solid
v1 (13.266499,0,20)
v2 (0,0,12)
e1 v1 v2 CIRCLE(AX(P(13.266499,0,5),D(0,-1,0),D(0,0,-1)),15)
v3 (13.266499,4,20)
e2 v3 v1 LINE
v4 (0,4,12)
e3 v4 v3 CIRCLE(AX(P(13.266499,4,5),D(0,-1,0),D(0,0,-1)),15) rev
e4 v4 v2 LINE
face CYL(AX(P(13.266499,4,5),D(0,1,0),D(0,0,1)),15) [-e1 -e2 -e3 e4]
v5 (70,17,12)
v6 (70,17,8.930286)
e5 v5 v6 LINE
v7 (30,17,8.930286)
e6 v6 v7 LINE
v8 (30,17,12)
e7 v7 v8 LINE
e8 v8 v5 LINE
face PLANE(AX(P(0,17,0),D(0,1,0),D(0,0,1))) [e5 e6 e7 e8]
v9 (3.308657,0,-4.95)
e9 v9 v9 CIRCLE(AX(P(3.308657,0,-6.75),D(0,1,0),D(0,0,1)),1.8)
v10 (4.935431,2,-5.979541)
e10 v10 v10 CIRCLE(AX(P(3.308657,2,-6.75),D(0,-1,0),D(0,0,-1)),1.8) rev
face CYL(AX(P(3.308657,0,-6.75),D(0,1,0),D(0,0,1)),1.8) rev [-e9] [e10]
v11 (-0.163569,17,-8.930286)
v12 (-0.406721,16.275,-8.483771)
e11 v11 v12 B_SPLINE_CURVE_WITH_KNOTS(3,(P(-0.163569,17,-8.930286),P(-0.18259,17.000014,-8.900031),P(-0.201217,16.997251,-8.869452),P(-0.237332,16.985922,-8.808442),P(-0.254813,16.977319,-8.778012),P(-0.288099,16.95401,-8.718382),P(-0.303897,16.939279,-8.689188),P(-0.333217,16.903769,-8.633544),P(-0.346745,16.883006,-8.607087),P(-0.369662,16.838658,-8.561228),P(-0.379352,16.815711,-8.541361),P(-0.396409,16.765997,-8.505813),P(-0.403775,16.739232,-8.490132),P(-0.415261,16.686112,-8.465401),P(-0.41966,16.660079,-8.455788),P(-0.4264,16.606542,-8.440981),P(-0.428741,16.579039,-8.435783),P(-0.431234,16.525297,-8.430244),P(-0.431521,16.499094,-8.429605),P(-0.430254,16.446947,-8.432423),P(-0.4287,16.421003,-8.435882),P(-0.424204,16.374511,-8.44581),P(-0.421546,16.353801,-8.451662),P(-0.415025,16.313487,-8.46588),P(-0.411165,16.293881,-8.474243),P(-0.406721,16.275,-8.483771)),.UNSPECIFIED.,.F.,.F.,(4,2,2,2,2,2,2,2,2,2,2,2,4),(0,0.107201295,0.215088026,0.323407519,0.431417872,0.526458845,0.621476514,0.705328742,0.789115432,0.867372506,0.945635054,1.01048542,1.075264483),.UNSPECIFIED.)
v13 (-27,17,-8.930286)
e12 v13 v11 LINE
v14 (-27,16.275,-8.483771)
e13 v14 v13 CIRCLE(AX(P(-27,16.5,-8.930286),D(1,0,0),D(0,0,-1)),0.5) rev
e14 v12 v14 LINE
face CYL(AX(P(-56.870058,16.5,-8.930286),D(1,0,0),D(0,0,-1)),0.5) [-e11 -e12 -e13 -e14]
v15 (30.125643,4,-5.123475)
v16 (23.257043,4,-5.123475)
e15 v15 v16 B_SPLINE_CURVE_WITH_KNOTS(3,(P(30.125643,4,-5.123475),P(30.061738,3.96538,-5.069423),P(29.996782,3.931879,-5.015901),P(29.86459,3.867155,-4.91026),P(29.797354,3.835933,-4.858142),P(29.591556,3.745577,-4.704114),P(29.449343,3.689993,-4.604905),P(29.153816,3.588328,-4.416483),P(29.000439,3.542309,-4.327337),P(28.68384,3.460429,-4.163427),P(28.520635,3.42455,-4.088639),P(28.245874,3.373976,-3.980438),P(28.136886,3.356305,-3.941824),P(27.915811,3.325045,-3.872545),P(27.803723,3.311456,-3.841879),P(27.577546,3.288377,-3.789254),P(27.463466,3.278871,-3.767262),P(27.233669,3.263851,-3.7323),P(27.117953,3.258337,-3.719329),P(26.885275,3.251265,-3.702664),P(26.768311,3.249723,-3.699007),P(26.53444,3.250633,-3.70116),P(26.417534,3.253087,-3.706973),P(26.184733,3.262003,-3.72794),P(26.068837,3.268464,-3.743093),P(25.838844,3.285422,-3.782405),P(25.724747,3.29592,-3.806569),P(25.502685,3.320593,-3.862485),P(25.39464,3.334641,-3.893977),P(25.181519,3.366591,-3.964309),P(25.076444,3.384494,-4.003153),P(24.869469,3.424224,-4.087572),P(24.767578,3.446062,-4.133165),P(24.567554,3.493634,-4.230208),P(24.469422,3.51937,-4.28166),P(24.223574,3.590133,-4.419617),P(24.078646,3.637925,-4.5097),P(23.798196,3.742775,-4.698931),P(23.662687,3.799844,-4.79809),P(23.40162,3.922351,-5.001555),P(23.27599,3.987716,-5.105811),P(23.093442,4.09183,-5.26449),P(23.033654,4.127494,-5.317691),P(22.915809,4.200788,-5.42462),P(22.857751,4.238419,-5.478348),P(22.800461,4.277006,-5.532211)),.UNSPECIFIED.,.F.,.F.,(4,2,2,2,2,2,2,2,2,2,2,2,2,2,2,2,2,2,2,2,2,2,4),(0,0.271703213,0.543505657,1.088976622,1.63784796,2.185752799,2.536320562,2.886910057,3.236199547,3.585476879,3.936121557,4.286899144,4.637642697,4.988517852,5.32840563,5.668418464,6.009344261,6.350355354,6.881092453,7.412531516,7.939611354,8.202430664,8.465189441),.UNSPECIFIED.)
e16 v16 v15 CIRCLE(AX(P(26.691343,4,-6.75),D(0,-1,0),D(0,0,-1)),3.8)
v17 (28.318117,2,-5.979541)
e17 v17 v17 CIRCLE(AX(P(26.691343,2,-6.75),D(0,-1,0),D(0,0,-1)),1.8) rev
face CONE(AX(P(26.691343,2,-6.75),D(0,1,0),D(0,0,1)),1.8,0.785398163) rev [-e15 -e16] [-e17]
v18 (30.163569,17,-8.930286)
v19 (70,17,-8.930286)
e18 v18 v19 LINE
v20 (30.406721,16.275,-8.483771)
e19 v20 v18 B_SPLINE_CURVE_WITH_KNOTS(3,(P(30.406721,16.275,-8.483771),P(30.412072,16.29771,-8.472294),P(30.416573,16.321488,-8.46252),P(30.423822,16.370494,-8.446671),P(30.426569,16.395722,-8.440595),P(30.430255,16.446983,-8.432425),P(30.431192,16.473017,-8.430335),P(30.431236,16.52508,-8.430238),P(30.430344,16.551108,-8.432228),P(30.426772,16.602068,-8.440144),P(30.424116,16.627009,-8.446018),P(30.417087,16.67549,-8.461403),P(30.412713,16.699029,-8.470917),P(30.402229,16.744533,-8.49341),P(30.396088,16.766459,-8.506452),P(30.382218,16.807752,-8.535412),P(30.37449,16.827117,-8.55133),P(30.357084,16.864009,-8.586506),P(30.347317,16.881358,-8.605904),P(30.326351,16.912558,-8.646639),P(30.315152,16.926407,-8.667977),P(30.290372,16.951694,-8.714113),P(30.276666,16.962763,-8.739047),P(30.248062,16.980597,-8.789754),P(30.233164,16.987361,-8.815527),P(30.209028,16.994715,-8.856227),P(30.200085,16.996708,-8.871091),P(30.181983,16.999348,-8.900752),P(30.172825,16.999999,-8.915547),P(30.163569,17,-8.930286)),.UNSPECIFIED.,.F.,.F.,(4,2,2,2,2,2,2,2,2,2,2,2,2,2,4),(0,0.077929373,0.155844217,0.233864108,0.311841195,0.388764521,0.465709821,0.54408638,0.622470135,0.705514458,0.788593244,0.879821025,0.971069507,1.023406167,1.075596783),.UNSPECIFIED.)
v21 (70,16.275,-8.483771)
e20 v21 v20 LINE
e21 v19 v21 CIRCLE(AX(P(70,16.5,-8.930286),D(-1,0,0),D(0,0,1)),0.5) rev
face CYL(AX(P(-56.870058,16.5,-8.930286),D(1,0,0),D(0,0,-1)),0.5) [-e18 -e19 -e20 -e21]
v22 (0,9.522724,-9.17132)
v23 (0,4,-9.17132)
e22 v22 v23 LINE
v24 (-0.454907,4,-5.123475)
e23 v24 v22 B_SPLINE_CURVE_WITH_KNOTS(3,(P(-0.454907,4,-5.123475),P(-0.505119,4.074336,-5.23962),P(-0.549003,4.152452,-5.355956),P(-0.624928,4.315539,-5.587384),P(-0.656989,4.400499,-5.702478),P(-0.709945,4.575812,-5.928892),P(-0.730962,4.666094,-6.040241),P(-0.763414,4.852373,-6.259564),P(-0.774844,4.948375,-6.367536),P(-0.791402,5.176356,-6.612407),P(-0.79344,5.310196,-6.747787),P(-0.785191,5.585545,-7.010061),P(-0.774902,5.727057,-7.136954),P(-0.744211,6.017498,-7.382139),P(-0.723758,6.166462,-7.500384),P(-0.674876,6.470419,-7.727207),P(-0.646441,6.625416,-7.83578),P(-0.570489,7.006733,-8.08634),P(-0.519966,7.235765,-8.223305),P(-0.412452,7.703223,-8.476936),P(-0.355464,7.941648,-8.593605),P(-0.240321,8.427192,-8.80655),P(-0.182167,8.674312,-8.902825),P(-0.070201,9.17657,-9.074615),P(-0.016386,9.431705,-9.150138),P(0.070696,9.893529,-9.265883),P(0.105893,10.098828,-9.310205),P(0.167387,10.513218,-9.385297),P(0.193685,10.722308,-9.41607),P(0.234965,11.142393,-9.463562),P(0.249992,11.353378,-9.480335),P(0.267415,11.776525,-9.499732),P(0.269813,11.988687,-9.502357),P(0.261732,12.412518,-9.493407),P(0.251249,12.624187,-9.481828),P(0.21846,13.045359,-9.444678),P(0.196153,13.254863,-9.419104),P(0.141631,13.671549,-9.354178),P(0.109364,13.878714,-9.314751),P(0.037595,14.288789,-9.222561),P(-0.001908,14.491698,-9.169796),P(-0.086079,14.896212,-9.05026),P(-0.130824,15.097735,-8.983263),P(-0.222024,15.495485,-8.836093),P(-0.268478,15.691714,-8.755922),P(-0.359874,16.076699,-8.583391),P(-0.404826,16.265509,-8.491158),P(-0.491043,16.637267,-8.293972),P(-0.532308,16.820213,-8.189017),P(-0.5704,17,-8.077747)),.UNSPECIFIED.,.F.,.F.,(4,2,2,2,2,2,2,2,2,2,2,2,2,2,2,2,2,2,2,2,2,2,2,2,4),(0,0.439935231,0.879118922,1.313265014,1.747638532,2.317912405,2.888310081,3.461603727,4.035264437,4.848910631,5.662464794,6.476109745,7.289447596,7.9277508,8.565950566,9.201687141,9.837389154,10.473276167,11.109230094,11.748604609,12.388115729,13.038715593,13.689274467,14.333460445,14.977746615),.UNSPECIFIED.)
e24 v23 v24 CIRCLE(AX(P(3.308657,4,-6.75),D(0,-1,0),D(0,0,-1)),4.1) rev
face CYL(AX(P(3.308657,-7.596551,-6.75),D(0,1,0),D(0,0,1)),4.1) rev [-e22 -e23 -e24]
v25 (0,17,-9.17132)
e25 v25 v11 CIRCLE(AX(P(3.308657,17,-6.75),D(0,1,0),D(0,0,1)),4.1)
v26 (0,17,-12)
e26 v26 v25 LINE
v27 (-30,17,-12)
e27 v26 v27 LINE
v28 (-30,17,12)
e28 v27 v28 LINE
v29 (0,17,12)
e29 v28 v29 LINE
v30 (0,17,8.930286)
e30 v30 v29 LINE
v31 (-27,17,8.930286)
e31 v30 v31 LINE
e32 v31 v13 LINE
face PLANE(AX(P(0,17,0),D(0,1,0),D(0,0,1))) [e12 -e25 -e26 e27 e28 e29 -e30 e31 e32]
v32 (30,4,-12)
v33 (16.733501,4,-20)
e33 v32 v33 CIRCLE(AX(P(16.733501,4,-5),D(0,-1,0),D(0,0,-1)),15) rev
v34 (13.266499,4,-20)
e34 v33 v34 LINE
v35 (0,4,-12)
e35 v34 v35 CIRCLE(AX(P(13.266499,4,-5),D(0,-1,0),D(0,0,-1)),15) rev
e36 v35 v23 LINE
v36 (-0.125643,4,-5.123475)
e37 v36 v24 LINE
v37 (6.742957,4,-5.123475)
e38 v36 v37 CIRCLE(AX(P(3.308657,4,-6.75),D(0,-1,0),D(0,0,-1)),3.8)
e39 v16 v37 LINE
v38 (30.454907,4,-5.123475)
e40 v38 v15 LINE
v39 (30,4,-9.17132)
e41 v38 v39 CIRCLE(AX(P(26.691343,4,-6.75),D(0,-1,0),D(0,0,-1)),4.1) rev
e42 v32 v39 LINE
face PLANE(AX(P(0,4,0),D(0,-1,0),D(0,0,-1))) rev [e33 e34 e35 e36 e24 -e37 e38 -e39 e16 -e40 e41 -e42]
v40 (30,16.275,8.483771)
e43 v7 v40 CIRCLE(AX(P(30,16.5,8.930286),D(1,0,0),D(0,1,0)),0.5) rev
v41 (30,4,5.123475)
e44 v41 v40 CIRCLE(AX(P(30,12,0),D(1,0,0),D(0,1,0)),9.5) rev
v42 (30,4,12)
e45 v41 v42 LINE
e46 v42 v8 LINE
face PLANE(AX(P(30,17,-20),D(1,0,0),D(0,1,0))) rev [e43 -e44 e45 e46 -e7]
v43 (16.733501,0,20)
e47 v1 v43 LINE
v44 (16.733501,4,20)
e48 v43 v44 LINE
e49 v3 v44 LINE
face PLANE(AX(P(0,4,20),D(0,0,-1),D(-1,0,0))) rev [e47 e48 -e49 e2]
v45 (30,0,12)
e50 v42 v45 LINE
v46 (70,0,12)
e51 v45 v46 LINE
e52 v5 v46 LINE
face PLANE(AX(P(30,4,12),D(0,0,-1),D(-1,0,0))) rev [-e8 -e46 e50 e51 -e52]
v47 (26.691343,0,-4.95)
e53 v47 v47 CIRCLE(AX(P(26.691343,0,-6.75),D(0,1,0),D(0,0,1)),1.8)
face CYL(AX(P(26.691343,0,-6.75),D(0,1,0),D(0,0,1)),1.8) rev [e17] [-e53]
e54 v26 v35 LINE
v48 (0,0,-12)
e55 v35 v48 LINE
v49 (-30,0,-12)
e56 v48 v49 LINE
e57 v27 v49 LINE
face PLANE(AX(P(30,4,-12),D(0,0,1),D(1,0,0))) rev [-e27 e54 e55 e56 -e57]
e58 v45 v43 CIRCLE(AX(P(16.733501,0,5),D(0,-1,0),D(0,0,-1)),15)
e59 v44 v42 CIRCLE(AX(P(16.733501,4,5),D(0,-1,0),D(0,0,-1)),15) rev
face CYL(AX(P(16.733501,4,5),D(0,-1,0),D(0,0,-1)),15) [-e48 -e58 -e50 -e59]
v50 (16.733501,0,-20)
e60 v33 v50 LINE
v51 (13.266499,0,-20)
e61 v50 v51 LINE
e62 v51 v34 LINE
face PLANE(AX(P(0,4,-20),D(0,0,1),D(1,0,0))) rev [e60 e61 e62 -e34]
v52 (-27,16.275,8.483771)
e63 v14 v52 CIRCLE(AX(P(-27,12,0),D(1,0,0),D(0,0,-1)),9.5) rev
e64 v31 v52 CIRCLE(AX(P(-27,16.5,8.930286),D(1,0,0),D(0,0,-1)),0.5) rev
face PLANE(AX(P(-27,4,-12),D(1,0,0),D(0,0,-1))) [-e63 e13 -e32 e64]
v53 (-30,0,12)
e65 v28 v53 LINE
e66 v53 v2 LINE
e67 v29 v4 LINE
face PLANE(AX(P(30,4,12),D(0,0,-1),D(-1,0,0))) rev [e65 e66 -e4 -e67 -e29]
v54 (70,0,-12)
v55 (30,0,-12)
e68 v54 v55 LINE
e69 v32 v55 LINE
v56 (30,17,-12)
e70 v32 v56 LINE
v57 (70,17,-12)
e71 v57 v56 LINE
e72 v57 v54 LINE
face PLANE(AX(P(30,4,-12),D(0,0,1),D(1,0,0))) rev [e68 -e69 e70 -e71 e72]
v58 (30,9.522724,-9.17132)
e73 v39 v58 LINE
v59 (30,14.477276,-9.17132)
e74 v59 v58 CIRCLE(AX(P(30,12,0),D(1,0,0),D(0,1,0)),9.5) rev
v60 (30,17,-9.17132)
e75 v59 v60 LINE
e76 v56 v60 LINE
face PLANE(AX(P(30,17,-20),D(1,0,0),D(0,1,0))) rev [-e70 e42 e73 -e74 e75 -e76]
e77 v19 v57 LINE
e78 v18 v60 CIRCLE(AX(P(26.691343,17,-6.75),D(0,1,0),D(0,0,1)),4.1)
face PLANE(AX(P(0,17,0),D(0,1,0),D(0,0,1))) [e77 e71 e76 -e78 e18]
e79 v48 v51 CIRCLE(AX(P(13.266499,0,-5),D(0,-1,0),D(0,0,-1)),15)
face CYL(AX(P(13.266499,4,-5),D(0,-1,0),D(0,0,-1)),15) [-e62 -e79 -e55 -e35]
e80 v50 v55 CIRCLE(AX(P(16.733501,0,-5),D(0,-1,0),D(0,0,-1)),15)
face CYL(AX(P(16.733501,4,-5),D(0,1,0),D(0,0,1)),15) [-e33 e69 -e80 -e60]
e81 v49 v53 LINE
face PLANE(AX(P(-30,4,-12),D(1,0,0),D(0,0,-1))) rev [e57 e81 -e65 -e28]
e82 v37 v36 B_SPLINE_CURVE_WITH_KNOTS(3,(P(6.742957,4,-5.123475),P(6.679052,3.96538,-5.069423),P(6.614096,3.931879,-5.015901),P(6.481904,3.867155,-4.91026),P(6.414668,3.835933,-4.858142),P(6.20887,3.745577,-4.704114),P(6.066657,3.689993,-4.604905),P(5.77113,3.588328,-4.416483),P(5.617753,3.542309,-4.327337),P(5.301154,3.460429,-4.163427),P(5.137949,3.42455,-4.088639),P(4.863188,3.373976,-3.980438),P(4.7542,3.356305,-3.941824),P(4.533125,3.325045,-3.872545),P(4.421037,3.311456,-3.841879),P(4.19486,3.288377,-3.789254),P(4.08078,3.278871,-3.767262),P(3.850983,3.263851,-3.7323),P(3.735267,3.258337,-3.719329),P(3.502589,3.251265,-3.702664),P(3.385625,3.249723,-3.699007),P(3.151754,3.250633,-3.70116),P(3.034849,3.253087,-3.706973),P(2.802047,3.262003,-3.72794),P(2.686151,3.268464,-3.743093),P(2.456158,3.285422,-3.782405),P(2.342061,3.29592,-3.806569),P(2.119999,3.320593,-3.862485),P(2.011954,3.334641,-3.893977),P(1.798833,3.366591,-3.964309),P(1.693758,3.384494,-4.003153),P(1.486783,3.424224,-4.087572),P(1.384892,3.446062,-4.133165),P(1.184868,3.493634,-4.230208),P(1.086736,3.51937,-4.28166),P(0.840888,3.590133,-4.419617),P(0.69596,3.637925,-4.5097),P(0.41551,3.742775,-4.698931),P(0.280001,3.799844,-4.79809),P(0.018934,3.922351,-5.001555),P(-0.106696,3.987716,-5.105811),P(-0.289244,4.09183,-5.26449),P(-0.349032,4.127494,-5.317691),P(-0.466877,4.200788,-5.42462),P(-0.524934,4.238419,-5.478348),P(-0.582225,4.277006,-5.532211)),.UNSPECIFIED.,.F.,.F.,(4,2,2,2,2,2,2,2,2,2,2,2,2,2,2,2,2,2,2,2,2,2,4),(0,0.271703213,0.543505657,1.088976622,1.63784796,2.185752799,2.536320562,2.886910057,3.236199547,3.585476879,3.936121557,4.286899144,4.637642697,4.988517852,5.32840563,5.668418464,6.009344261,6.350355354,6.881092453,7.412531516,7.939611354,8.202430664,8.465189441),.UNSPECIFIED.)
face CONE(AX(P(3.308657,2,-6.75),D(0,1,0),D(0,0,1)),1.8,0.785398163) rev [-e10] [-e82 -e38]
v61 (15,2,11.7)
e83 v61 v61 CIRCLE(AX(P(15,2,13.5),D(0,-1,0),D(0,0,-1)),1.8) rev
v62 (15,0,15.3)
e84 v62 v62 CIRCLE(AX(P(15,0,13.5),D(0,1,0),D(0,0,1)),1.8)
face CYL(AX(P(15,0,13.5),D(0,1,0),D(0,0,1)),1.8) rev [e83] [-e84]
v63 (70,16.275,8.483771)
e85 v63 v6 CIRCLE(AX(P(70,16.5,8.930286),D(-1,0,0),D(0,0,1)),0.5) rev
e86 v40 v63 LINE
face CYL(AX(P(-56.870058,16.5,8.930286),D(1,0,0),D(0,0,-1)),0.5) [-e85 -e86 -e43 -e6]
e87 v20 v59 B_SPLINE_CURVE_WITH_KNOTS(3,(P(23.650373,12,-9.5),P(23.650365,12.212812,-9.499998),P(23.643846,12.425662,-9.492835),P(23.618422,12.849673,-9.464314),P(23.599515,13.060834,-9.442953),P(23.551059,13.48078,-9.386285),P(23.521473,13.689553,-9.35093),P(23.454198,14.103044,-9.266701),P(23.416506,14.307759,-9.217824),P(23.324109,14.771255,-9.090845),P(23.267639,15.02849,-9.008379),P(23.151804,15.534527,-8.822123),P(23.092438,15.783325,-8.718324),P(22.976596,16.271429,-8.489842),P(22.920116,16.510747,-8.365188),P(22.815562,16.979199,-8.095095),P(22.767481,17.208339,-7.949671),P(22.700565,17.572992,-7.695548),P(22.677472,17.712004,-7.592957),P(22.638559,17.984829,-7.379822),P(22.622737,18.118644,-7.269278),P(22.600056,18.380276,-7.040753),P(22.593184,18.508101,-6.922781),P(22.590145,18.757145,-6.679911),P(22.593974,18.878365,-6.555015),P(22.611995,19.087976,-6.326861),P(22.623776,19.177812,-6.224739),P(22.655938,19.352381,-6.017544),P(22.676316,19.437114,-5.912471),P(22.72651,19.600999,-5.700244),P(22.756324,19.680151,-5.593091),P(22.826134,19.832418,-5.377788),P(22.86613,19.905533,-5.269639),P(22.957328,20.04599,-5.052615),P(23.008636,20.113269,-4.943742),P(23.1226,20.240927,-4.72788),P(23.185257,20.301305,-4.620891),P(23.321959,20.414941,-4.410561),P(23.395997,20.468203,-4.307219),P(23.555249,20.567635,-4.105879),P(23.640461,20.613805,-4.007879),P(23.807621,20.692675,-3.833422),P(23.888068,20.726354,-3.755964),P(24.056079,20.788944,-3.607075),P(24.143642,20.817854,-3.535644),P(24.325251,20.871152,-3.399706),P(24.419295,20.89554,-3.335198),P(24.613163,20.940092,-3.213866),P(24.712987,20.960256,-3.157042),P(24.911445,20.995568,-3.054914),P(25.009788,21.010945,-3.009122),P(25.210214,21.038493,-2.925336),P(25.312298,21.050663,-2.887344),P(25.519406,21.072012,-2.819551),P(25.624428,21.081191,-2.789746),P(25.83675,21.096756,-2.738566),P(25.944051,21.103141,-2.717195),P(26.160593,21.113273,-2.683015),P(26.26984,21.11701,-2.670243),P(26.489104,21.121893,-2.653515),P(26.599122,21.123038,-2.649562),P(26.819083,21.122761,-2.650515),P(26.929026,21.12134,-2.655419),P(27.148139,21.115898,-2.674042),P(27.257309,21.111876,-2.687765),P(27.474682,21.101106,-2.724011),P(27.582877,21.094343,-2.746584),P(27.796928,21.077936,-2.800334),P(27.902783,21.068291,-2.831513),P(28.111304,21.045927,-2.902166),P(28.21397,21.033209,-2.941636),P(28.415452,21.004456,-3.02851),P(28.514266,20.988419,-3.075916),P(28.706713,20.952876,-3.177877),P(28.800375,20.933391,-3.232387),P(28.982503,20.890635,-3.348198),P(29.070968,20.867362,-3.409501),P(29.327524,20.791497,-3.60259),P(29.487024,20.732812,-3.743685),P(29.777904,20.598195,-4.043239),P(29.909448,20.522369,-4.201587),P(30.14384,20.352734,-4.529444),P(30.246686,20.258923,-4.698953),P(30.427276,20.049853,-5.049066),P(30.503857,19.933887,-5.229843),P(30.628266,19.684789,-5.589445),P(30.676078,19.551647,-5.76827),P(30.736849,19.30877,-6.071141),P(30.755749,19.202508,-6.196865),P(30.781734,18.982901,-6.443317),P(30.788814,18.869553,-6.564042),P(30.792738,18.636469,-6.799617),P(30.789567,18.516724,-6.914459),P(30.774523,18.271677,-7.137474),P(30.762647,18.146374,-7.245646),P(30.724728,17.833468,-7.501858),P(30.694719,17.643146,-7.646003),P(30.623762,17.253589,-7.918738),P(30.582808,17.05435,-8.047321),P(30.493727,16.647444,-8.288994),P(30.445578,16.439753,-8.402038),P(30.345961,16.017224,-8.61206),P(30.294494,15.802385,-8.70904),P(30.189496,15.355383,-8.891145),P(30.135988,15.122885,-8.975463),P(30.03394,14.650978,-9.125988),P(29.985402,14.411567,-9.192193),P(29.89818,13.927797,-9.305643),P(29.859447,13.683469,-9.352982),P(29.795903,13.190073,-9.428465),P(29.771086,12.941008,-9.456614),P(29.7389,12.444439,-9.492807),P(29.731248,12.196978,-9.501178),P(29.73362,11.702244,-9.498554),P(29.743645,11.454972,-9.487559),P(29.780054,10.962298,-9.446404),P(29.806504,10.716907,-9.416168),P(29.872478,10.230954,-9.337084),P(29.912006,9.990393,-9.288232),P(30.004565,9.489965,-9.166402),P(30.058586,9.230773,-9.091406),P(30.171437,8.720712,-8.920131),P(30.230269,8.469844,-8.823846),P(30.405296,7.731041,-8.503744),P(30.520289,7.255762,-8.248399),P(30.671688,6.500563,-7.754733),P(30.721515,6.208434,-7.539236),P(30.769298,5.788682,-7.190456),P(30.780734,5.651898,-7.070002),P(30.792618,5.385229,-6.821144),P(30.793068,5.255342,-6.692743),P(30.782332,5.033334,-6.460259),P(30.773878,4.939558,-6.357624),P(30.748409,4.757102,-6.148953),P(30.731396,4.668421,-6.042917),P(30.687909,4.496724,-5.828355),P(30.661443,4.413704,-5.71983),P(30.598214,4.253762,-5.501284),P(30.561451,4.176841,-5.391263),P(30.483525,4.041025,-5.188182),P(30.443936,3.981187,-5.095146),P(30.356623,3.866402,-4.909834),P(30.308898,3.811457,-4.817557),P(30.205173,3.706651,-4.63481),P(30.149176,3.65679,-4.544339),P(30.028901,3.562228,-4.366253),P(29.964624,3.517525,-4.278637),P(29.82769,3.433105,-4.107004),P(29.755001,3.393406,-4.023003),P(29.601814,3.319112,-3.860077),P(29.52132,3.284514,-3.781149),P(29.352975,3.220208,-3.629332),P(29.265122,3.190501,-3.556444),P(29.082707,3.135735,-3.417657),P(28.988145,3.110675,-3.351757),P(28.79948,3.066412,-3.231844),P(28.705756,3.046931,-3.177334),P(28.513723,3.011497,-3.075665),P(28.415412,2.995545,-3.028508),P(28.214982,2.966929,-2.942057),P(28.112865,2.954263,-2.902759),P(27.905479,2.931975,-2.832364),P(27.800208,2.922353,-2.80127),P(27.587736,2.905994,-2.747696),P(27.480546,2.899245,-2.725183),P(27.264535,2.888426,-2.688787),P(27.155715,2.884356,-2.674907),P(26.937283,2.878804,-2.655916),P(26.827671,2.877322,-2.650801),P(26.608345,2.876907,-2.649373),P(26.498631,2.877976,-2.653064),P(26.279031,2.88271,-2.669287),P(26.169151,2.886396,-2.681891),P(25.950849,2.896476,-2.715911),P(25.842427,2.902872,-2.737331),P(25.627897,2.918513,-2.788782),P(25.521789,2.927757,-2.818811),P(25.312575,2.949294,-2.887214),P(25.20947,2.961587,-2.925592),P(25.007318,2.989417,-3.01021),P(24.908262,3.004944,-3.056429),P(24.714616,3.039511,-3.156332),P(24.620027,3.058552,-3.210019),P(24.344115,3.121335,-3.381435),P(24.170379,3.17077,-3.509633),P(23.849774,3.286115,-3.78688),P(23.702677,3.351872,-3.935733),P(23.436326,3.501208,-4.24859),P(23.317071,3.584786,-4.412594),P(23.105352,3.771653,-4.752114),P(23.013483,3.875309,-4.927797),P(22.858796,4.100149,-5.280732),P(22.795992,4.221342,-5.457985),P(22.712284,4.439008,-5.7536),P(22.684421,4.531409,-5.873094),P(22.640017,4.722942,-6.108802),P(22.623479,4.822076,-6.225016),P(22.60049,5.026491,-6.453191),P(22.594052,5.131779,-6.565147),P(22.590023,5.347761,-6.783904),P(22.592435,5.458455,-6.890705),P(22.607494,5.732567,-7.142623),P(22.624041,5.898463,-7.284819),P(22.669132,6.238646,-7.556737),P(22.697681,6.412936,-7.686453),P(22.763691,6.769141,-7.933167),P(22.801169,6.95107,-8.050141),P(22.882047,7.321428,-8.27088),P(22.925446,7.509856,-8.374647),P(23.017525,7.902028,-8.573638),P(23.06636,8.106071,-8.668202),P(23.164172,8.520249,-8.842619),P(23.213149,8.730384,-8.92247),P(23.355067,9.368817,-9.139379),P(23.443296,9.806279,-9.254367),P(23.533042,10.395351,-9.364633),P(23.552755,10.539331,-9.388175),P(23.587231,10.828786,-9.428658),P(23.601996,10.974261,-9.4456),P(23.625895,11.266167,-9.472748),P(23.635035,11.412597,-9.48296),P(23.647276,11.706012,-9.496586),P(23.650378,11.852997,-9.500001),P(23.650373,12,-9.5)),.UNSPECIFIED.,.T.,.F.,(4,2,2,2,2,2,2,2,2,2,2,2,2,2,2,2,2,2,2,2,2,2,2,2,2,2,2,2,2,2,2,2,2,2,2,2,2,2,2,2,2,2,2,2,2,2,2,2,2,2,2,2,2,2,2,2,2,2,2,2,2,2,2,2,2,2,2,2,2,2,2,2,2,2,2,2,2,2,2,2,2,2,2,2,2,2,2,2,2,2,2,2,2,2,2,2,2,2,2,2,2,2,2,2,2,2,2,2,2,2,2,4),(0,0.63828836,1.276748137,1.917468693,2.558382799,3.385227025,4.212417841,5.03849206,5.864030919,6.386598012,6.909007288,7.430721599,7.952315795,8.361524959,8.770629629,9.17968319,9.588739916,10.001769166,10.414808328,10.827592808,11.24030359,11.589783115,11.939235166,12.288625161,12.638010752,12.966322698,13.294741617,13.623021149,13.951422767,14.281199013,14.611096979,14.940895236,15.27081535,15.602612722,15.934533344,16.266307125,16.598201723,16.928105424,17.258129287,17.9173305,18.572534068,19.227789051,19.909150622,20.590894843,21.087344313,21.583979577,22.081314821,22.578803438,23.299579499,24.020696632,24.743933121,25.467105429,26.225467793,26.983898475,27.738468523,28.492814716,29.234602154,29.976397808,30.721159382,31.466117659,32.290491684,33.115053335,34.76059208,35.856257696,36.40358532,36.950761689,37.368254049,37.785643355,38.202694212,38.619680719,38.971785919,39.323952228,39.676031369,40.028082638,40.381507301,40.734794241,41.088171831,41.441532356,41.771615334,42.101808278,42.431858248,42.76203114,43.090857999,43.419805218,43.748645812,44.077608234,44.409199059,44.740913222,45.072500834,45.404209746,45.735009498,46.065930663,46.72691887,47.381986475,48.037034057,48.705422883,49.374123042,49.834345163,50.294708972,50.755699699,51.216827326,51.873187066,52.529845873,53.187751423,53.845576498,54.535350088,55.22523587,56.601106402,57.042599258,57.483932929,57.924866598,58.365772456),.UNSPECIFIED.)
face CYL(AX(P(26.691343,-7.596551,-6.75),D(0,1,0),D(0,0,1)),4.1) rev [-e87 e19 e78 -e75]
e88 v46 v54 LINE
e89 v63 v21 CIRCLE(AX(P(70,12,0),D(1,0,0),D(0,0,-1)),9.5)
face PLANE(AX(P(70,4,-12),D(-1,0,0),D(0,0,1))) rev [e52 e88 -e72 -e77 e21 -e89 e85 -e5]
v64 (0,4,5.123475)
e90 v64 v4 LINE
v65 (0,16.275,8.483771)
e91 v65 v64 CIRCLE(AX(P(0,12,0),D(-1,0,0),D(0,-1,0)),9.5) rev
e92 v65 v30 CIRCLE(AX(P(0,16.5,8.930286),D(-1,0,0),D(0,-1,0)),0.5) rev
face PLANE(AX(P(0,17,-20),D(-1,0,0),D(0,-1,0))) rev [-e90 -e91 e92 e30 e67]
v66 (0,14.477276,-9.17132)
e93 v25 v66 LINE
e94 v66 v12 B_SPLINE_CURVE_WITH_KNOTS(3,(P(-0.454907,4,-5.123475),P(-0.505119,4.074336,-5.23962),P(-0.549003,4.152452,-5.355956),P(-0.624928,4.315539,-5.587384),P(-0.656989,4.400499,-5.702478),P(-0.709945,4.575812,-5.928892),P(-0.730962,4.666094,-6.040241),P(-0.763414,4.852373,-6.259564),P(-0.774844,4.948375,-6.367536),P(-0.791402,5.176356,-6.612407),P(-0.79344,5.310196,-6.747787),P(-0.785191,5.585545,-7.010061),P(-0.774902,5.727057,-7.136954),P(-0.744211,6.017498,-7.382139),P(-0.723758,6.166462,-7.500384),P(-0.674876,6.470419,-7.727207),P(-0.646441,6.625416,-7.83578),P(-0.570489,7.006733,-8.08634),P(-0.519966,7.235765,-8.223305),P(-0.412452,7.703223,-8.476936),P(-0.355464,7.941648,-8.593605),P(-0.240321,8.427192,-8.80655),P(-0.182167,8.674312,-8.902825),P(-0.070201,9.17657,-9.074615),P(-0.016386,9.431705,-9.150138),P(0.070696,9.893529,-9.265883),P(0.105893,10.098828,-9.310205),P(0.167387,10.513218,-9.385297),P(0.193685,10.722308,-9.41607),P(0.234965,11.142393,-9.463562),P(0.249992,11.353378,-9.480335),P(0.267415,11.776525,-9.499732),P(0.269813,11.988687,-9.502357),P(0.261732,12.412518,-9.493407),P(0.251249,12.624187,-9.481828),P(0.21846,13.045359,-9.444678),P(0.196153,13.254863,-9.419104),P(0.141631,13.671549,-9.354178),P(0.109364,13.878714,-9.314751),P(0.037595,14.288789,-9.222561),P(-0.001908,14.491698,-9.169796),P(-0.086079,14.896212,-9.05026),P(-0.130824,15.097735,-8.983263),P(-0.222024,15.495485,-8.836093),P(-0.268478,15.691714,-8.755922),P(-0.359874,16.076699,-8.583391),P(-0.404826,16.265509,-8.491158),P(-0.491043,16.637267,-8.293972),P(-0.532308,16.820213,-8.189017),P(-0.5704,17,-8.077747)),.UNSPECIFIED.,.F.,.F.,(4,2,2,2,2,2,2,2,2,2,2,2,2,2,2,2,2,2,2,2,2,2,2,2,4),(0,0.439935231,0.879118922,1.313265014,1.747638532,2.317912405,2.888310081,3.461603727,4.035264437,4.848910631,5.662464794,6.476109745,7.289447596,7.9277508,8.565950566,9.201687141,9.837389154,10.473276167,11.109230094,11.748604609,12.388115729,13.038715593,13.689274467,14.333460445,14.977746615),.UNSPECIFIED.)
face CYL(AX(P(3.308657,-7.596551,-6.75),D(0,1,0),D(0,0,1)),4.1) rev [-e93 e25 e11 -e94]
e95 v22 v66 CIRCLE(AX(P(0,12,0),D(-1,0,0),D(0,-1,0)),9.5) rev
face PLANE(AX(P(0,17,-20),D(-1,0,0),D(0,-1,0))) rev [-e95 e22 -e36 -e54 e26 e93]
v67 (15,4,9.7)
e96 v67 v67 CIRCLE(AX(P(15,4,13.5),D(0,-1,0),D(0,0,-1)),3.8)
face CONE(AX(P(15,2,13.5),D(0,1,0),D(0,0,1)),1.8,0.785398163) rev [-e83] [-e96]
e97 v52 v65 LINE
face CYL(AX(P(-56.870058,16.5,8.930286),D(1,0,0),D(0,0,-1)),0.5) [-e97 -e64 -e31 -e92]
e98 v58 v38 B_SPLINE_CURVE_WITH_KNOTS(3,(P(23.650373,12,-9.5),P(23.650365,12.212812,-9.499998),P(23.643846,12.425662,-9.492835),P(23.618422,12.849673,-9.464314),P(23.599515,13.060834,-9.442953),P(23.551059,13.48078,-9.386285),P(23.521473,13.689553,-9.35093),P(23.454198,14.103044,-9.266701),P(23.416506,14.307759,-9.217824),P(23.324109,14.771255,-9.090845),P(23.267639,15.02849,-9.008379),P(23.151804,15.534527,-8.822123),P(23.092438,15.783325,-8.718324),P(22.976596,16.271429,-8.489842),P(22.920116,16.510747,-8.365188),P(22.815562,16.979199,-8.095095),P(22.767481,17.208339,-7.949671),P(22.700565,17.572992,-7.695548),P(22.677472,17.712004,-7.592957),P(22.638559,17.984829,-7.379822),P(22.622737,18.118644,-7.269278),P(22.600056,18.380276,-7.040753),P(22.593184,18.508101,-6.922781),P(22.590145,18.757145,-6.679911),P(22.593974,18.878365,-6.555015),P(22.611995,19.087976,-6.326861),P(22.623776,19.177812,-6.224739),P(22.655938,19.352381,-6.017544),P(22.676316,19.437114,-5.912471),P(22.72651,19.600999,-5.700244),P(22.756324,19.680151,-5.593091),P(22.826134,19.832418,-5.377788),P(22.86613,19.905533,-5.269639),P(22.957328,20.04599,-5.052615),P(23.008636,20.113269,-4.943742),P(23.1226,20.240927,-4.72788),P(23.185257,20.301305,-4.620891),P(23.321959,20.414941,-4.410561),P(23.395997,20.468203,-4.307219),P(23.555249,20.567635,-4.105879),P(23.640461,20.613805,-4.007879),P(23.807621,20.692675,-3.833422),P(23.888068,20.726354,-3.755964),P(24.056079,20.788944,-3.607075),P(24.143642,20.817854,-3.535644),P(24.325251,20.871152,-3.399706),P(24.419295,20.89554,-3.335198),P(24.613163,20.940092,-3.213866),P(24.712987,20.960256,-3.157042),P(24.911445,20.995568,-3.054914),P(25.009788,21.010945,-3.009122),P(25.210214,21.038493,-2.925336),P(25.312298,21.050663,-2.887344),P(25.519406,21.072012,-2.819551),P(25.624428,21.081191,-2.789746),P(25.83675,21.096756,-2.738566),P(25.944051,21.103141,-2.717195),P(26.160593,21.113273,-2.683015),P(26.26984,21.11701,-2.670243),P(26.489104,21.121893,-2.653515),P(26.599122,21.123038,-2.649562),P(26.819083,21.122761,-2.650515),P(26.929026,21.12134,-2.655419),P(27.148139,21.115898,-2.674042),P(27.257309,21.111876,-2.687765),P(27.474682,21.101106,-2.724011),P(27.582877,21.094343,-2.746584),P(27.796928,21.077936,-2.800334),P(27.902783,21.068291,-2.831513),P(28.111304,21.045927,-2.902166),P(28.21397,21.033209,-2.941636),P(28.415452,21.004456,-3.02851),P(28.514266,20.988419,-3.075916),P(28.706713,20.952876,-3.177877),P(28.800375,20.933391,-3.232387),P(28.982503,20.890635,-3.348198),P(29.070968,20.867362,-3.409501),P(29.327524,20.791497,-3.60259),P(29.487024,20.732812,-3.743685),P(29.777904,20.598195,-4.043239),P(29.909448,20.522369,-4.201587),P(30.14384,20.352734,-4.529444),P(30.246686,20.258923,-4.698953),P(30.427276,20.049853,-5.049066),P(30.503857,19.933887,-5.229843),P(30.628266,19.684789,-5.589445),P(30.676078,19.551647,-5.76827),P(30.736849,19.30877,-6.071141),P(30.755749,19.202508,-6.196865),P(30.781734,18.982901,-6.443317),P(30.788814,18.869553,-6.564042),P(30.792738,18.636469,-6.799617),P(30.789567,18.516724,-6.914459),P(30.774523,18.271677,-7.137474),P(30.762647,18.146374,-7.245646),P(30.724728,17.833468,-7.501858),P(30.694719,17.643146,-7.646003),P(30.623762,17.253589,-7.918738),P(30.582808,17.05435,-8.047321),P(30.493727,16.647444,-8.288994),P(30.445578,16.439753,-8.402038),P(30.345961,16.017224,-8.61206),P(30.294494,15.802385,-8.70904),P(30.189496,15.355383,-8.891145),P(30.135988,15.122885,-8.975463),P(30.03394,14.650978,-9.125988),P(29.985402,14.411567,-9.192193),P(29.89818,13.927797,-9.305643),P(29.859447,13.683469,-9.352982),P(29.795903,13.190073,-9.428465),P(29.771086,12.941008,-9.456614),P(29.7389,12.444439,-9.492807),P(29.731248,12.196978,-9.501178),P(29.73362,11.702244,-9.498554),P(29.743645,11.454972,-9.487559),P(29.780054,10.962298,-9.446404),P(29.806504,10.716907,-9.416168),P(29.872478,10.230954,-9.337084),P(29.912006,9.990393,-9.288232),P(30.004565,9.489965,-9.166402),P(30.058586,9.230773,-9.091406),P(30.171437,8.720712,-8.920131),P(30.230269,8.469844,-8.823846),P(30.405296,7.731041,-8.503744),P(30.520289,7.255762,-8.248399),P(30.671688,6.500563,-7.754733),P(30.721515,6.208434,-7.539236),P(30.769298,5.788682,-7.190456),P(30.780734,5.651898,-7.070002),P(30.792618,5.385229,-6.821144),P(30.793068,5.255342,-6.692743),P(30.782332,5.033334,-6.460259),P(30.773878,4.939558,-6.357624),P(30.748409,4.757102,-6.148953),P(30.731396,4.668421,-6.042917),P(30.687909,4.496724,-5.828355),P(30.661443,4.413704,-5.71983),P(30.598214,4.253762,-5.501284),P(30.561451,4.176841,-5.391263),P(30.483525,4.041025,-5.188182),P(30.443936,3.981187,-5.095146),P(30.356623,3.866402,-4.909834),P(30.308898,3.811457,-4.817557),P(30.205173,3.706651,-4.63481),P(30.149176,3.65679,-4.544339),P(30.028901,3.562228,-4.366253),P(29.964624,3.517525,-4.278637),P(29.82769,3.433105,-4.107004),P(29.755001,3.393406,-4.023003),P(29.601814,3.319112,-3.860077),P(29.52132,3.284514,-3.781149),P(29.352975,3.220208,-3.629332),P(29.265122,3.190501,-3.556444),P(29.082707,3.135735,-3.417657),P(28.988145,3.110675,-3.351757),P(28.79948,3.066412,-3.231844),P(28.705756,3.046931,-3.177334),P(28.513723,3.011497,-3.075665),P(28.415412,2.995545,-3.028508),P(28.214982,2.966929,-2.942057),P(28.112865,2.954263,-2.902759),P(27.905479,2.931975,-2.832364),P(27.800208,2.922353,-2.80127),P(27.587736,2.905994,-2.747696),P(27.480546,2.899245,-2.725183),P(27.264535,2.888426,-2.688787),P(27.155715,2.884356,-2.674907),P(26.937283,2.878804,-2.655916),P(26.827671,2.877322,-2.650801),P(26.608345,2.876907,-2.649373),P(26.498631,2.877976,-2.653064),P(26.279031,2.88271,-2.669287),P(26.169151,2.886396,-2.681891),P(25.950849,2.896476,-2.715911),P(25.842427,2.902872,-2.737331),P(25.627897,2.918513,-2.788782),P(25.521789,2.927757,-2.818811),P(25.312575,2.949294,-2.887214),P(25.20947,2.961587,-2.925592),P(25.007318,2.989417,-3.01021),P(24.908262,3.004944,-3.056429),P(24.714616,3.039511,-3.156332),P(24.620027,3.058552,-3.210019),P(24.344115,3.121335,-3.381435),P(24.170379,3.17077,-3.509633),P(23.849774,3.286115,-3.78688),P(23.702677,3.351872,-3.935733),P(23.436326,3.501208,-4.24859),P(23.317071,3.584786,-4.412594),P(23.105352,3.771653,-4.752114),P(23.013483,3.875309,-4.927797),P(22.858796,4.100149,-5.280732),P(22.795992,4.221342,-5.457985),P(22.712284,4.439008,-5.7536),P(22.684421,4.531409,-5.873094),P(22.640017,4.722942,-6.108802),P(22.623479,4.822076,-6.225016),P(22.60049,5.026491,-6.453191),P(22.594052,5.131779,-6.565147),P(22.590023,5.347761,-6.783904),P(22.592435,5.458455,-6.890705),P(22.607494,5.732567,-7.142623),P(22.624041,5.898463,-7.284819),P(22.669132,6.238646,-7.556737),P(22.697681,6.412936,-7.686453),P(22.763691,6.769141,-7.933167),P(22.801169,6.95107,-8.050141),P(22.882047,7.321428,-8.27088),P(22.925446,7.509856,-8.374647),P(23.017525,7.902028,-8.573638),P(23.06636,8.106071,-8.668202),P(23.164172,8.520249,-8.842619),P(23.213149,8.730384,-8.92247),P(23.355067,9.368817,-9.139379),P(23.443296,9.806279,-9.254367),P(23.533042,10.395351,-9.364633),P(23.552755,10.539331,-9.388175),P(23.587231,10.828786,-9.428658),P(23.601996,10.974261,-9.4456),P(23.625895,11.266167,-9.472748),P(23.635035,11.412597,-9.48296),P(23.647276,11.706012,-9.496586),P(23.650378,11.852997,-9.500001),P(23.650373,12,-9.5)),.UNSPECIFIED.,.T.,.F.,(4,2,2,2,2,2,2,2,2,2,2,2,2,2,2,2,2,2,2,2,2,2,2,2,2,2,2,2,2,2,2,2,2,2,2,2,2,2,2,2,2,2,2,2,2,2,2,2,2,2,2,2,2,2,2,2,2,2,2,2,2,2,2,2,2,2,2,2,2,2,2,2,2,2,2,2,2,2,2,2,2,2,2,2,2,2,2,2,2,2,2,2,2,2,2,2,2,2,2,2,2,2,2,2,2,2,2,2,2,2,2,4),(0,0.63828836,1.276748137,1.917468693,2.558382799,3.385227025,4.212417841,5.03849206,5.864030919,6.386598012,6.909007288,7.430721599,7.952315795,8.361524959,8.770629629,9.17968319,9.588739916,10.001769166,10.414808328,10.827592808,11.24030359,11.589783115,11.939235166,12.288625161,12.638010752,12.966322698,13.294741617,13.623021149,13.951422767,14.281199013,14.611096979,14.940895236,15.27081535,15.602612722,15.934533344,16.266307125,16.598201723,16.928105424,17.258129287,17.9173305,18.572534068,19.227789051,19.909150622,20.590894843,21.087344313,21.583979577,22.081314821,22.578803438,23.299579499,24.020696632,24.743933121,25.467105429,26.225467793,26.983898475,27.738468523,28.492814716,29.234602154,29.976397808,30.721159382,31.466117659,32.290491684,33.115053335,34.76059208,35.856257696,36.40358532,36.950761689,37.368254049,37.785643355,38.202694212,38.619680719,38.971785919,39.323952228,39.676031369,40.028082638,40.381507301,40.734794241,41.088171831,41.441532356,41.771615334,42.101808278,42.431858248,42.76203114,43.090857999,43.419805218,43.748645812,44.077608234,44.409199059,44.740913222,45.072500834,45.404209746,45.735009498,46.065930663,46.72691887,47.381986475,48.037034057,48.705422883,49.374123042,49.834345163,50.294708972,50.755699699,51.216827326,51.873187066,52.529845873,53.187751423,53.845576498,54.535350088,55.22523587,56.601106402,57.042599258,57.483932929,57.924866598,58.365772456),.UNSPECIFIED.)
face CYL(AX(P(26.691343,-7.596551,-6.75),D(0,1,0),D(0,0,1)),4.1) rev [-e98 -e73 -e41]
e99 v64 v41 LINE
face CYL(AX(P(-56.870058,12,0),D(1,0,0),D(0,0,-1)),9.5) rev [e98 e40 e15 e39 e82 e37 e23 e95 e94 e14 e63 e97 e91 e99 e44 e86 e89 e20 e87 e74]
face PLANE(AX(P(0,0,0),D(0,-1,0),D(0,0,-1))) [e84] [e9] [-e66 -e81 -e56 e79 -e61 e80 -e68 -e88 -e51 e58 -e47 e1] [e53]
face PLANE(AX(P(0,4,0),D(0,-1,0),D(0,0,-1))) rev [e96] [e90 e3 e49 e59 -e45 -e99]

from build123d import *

# Parameters (mm, degrees)
EXTRUDE_2_DEPTH     = 4
SKETCH_7_W          = 100
SKETCH_7_H          = 24
EXTRUDE_3_DEPTH     = 13
SKETCH_8_R          = 9.5
CUT_EXTRUDE_3_DEPTH = 97
SKETCH_9_W          = 30
SKETCH_9_H          = 13
CUT_EXTRUDE_4_DEPTH = 79.822585596
SKETCH_10_R         = 1.8
CUT_EXTRUDE_5_DEPTH = 74.952687578
FILLET_3_R          = 15
FILLET_4_R          = 0.5
CUT_EXTRUDE_9_REACH = 76.76
SKETCH_11_R         = 4.1


with BuildPart() as part:
    # Эскиз6 → Бобышка-Вытянуть2 (new body)
    with BuildSketch(Plane(origin=(0, 0, 0), x_dir=(1, 0, 0), z_dir=(0, 1, 0))):
        Polygon((0, 20), (0, 12), (-30, 12), (-30, -12), (0, -12), (0, -20), (30, -20), (30, -12), (70, -12), (70, 12), (30, 12), (30, 20), align=None)
    extrude(amount=EXTRUDE_2_DEPTH)

    # Эскиз7 → Бобышка-Вытянуть3 (add)
    with BuildSketch(Plane(origin=(0, 4, 0), x_dir=(1, 0, 0), z_dir=(0, 1, 0))):
        with Locations((20, 0)):
            Rectangle(SKETCH_7_W, SKETCH_7_H)
    extrude(amount=EXTRUDE_3_DEPTH)

    # Эскиз8 → Вырез-Вытянуть3 (cut)
    with BuildSketch(Plane(origin=(70, 0, 0), x_dir=(0, 0, -1), z_dir=(1, 0, 0))):
        with Locations((0, 12)):
            Circle(SKETCH_8_R)
    extrude(amount=-CUT_EXTRUDE_3_DEPTH, mode=Mode.SUBTRACT)

    # Эскиз9 → Вырез-Вытянуть4 (cut, through all)
    with BuildSketch(Plane.XY.offset(12)):
        with Locations((15, 10.5)):
            Rectangle(SKETCH_9_W, SKETCH_9_H)
    extrude(amount=-CUT_EXTRUDE_4_DEPTH, mode=Mode.SUBTRACT)

    # Эскиз10 → Вырез-Вытянуть5 (cut, through all)
    with BuildSketch(Plane(origin=(0, 4, 0), x_dir=(1, 0, 0), z_dir=(0, 1, 0))):
        with Locations(Location((15, -13.5, 0), (0, 0, 270))):
            Circle(SKETCH_10_R)
        with Locations(Location((3.308657049, 6.75, 0), (0, 0, 270))):
            Circle(SKETCH_10_R)
        with Locations(Location((26.691342951, 6.75, 0), (0, 0, 270))):
            Circle(SKETCH_10_R)
    extrude(amount=-CUT_EXTRUDE_5_DEPTH, mode=Mode.SUBTRACT)

    # Скругление3
    # the kernel refuses this fillet: 15 mm, written as the material it takes off along each edge
    with BuildSketch(Plane(origin=(30, -33.166247904, -20), x_dir=(-1, 0, 0), z_dir=(0, 1, 0))) as fillet_3_piece_1:
        with BuildLine():
            CenterArc((13.266499161, 15), FILLET_3_R, 207.818139285, 62.181860715)
            Line((0, 8), (-0.265329983, 7.86))
            ThreePointArc((-0.265329983, 7.86), (-0.3, 4), (-0.3, 0))
            Line((-0.3, 0), (0, -0.3))
            Line((0, -0.3), (13.266499161, -0.3))
            Line((13.266499161, -0.3), (13.266499161, 0))
        make_face()
    extrude(amount=70.332495807, mode=Mode.SUBTRACT)
    with BuildSketch(Plane(origin=(0, -33.166247904, -20), x_dir=(0, 0, 1), z_dir=(0, 1, 0))) as fillet_3_piece_2:
        with BuildLine():
            CenterArc((15, 13.266499161), FILLET_3_R, 180, 62.181860715)
            Line((0, 13.266499161), (-0.3, 13.266499161))
            Line((-0.3, 13.266499161), (-0.3, 0))
            Line((-0.3, 0), (0, -0.3))
            ThreePointArc((0, -0.3), (4, -0.3), (7.86, -0.265329983))
            Line((7.86, -0.265329983), (8, 0))
        make_face()
    extrude(amount=70.332495807, mode=Mode.SUBTRACT)
    with BuildSketch(Plane(origin=(30, -33.166247904, 20), x_dir=(-1, 0, 0), z_dir=(0, 1, 0))) as fillet_3_piece_3:
        with BuildLine():
            CenterArc((13.266499161, -15), FILLET_3_R, 90, 62.181860715)
            Line((0, -8), (-0.265329983, -7.86))
            ThreePointArc((-0.265329983, -7.86), (-0.3, -4), (-0.3, 0))
            Line((-0.3, 0), (0, 0.3))
            Line((0, 0.3), (13.266499161, 0.3))
            Line((13.266499161, 0.3), (13.266499161, 0))
        make_face()
    extrude(amount=70.332495807, mode=Mode.SUBTRACT)
    with BuildSketch(Plane(origin=(0, -33.166247904, 20), x_dir=(0, 0, -1), z_dir=(0, 1, 0))) as fillet_3_piece_4:
        with BuildLine():
            CenterArc((15, -13.266499161), FILLET_3_R, 117.818139285, 62.181860715)
            Line((0, -13.266499161), (-0.3, -13.266499161))
            Line((-0.3, -13.266499161), (-0.3, 0))
            Line((-0.3, 0), (0, 0.3))
            ThreePointArc((0, 0.3), (4, 0.3), (7.86, 0.265329983))
            Line((7.86, 0.265329983), (8, 0))
        make_face()
    extrude(amount=70.332495807, mode=Mode.SUBTRACT)

    # Скругление4
    fillet_4_edges = [part.edges().sort_by_distance(p)[0] for p in [
        (50, 17, -8.077747211),
        (-13.5, 17, 8.077747211),
        (50, 17, 8.077747211),
        (-13.5, 17, -8.077747211),
    ]]
    fillet(fillet_4_edges, radius=FILLET_4_R)

    # Вырез-Вытянуть9: up to this face of the body (flat: up to its plane)
    cut_extrude_9_end = Plane(part.part.faces().sort_by_distance((15, 4, 11.690077791))[0])
    # Эскиз11 → Вырез-Вытянуть9 (cut, up to the picked face)
    with BuildSketch(Plane(origin=(0, 17, 0), x_dir=(1, 0, 0), z_dir=(0, 1, 0)), mode=Mode.PRIVATE) as cut_extrude_9_sk1:
        with Locations((15, -13.5)):
            Circle(SKETCH_11_R)
    cut_extrude_9_tool1 = split(extrude(cut_extrude_9_sk1.sketch, amount=-CUT_EXTRUDE_9_REACH, mode=Mode.PRIVATE), bisect_by=cut_extrude_9_end, keep=Keep.BOTH, mode=Mode.PRIVATE)
    # Эскиз11 → Вырез-Вытянуть9 (cut, up to the picked face)
    with BuildSketch(Plane(origin=(0, 17, 0), x_dir=(1, 0, 0), z_dir=(0, 1, 0)), mode=Mode.PRIVATE) as cut_extrude_9_sk2:
        with Locations((3.308657049, 6.75)):
            Circle(SKETCH_11_R)
    cut_extrude_9_tool2 = split(extrude(cut_extrude_9_sk2.sketch, amount=-CUT_EXTRUDE_9_REACH, mode=Mode.PRIVATE), bisect_by=cut_extrude_9_end, keep=Keep.BOTH, mode=Mode.PRIVATE)
    # Эскиз11 → Вырез-Вытянуть9 (cut, up to the picked face)
    with BuildSketch(Plane(origin=(0, 17, 0), x_dir=(1, 0, 0), z_dir=(0, 1, 0)), mode=Mode.PRIVATE) as cut_extrude_9_sk3:
        with Locations((26.691342951, 6.75)):
            Circle(SKETCH_11_R)
    cut_extrude_9_tool3 = split(extrude(cut_extrude_9_sk3.sketch, amount=-CUT_EXTRUDE_9_REACH, mode=Mode.PRIVATE), bisect_by=cut_extrude_9_end, keep=Keep.BOTH, mode=Mode.PRIVATE)
    add(cut_extrude_9_tool1.solids().sort_by(Axis((15, 17, 13.5), (0, -1, 0)))[0], mode=Mode.SUBTRACT)
    add(cut_extrude_9_tool2.solids().sort_by(Axis((3.308657, 17, -6.75), (0, -1, 0)))[0], mode=Mode.SUBTRACT)
    add(cut_extrude_9_tool3.solids().sort_by(Axis((26.691343, 17, -6.75), (0, -1, 0)))[0], mode=Mode.SUBTRACT)

    # Фаска2: read off the stored shape, not the designer's step
    # Фаска2 outline → Фаска2 (revolve, cut)
    with BuildSketch(Plane(origin=(26.691342951, 0, -6.75), x_dir=(1, 0, 0), z_dir=(0, 0, 1))):
        Polygon((1.8, 4.000001023), (1.8, 2), (3.800001023, 4.000001023), align=None)
    revolve(axis=Axis((26.691342951, 0, -6.75), (0, 1, 0)), mode=Mode.SUBTRACT)

    # Фаска1: read off the stored shape, not the designer's step
    # Фаска1: loft between two sections, ruled curve by curve
    chamfer_1_from = [
        Edge.make_three_point_arc((15, 2, 11.7), (13.2, 2, 13.5), (15, 2, 15.3)),
        Edge.make_three_point_arc((15, 2, 15.3), (16.8, 2, 13.5), (15, 2, 11.7)),
    ]
    chamfer_1_to = [
        Edge.make_three_point_arc((15, 4, 9.7), (11.2, 4, 13.5), (15, 4, 17.3)),
        Edge.make_three_point_arc((15, 4, 17.3), (18.8, 4, 13.5), (15, 4, 9.7)),
    ]
    chamfer_1 = Solid(Shell([*[Face.make_surface_from_curves(chamfer_1_from[k], chamfer_1_to[k]) for k in range(2)], Face(Wire(chamfer_1_from)), Face(Wire(chamfer_1_to))]))
    add(chamfer_1, mode=Mode.SUBTRACT)

    # Chamfer 1 2: loft between two sections, ruled curve by curve
    chamfer_1_2_from = [
        Edge.make_three_point_arc((4.935430815, 2, -5.979540971), (4.079116078, 2, -8.376773766), (1.681883283, 2, -7.520459029)),
        Edge.make_three_point_arc((1.681883283, 2, -7.520459029), (2.53819802, 2, -5.123226234), (4.935430815, 2, -5.979540971)),
    ]
    chamfer_1_2_to = [
        Edge.make_three_point_arc((6.742958145, 4.000001023, -5.123474945), (4.935182104, 4.000001023, -10.184301096), (-0.125644047, 4.000001023, -8.376525055)),
        Edge.make_three_point_arc((-0.125644047, 4.000001023, -8.376525055), (1.682131994, 4.000001023, -3.315698904), (6.742958145, 4.000001023, -5.123474945)),
    ]
    chamfer_1_2 = Solid(Shell([*[Face.make_surface_from_curves(chamfer_1_2_from[k], chamfer_1_2_to[k]) for k in range(2)], Face(Wire(chamfer_1_2_from)), Face(Wire(chamfer_1_2_to))]))
    add(chamfer_1_2, mode=Mode.SUBTRACT)


solid = part.part
